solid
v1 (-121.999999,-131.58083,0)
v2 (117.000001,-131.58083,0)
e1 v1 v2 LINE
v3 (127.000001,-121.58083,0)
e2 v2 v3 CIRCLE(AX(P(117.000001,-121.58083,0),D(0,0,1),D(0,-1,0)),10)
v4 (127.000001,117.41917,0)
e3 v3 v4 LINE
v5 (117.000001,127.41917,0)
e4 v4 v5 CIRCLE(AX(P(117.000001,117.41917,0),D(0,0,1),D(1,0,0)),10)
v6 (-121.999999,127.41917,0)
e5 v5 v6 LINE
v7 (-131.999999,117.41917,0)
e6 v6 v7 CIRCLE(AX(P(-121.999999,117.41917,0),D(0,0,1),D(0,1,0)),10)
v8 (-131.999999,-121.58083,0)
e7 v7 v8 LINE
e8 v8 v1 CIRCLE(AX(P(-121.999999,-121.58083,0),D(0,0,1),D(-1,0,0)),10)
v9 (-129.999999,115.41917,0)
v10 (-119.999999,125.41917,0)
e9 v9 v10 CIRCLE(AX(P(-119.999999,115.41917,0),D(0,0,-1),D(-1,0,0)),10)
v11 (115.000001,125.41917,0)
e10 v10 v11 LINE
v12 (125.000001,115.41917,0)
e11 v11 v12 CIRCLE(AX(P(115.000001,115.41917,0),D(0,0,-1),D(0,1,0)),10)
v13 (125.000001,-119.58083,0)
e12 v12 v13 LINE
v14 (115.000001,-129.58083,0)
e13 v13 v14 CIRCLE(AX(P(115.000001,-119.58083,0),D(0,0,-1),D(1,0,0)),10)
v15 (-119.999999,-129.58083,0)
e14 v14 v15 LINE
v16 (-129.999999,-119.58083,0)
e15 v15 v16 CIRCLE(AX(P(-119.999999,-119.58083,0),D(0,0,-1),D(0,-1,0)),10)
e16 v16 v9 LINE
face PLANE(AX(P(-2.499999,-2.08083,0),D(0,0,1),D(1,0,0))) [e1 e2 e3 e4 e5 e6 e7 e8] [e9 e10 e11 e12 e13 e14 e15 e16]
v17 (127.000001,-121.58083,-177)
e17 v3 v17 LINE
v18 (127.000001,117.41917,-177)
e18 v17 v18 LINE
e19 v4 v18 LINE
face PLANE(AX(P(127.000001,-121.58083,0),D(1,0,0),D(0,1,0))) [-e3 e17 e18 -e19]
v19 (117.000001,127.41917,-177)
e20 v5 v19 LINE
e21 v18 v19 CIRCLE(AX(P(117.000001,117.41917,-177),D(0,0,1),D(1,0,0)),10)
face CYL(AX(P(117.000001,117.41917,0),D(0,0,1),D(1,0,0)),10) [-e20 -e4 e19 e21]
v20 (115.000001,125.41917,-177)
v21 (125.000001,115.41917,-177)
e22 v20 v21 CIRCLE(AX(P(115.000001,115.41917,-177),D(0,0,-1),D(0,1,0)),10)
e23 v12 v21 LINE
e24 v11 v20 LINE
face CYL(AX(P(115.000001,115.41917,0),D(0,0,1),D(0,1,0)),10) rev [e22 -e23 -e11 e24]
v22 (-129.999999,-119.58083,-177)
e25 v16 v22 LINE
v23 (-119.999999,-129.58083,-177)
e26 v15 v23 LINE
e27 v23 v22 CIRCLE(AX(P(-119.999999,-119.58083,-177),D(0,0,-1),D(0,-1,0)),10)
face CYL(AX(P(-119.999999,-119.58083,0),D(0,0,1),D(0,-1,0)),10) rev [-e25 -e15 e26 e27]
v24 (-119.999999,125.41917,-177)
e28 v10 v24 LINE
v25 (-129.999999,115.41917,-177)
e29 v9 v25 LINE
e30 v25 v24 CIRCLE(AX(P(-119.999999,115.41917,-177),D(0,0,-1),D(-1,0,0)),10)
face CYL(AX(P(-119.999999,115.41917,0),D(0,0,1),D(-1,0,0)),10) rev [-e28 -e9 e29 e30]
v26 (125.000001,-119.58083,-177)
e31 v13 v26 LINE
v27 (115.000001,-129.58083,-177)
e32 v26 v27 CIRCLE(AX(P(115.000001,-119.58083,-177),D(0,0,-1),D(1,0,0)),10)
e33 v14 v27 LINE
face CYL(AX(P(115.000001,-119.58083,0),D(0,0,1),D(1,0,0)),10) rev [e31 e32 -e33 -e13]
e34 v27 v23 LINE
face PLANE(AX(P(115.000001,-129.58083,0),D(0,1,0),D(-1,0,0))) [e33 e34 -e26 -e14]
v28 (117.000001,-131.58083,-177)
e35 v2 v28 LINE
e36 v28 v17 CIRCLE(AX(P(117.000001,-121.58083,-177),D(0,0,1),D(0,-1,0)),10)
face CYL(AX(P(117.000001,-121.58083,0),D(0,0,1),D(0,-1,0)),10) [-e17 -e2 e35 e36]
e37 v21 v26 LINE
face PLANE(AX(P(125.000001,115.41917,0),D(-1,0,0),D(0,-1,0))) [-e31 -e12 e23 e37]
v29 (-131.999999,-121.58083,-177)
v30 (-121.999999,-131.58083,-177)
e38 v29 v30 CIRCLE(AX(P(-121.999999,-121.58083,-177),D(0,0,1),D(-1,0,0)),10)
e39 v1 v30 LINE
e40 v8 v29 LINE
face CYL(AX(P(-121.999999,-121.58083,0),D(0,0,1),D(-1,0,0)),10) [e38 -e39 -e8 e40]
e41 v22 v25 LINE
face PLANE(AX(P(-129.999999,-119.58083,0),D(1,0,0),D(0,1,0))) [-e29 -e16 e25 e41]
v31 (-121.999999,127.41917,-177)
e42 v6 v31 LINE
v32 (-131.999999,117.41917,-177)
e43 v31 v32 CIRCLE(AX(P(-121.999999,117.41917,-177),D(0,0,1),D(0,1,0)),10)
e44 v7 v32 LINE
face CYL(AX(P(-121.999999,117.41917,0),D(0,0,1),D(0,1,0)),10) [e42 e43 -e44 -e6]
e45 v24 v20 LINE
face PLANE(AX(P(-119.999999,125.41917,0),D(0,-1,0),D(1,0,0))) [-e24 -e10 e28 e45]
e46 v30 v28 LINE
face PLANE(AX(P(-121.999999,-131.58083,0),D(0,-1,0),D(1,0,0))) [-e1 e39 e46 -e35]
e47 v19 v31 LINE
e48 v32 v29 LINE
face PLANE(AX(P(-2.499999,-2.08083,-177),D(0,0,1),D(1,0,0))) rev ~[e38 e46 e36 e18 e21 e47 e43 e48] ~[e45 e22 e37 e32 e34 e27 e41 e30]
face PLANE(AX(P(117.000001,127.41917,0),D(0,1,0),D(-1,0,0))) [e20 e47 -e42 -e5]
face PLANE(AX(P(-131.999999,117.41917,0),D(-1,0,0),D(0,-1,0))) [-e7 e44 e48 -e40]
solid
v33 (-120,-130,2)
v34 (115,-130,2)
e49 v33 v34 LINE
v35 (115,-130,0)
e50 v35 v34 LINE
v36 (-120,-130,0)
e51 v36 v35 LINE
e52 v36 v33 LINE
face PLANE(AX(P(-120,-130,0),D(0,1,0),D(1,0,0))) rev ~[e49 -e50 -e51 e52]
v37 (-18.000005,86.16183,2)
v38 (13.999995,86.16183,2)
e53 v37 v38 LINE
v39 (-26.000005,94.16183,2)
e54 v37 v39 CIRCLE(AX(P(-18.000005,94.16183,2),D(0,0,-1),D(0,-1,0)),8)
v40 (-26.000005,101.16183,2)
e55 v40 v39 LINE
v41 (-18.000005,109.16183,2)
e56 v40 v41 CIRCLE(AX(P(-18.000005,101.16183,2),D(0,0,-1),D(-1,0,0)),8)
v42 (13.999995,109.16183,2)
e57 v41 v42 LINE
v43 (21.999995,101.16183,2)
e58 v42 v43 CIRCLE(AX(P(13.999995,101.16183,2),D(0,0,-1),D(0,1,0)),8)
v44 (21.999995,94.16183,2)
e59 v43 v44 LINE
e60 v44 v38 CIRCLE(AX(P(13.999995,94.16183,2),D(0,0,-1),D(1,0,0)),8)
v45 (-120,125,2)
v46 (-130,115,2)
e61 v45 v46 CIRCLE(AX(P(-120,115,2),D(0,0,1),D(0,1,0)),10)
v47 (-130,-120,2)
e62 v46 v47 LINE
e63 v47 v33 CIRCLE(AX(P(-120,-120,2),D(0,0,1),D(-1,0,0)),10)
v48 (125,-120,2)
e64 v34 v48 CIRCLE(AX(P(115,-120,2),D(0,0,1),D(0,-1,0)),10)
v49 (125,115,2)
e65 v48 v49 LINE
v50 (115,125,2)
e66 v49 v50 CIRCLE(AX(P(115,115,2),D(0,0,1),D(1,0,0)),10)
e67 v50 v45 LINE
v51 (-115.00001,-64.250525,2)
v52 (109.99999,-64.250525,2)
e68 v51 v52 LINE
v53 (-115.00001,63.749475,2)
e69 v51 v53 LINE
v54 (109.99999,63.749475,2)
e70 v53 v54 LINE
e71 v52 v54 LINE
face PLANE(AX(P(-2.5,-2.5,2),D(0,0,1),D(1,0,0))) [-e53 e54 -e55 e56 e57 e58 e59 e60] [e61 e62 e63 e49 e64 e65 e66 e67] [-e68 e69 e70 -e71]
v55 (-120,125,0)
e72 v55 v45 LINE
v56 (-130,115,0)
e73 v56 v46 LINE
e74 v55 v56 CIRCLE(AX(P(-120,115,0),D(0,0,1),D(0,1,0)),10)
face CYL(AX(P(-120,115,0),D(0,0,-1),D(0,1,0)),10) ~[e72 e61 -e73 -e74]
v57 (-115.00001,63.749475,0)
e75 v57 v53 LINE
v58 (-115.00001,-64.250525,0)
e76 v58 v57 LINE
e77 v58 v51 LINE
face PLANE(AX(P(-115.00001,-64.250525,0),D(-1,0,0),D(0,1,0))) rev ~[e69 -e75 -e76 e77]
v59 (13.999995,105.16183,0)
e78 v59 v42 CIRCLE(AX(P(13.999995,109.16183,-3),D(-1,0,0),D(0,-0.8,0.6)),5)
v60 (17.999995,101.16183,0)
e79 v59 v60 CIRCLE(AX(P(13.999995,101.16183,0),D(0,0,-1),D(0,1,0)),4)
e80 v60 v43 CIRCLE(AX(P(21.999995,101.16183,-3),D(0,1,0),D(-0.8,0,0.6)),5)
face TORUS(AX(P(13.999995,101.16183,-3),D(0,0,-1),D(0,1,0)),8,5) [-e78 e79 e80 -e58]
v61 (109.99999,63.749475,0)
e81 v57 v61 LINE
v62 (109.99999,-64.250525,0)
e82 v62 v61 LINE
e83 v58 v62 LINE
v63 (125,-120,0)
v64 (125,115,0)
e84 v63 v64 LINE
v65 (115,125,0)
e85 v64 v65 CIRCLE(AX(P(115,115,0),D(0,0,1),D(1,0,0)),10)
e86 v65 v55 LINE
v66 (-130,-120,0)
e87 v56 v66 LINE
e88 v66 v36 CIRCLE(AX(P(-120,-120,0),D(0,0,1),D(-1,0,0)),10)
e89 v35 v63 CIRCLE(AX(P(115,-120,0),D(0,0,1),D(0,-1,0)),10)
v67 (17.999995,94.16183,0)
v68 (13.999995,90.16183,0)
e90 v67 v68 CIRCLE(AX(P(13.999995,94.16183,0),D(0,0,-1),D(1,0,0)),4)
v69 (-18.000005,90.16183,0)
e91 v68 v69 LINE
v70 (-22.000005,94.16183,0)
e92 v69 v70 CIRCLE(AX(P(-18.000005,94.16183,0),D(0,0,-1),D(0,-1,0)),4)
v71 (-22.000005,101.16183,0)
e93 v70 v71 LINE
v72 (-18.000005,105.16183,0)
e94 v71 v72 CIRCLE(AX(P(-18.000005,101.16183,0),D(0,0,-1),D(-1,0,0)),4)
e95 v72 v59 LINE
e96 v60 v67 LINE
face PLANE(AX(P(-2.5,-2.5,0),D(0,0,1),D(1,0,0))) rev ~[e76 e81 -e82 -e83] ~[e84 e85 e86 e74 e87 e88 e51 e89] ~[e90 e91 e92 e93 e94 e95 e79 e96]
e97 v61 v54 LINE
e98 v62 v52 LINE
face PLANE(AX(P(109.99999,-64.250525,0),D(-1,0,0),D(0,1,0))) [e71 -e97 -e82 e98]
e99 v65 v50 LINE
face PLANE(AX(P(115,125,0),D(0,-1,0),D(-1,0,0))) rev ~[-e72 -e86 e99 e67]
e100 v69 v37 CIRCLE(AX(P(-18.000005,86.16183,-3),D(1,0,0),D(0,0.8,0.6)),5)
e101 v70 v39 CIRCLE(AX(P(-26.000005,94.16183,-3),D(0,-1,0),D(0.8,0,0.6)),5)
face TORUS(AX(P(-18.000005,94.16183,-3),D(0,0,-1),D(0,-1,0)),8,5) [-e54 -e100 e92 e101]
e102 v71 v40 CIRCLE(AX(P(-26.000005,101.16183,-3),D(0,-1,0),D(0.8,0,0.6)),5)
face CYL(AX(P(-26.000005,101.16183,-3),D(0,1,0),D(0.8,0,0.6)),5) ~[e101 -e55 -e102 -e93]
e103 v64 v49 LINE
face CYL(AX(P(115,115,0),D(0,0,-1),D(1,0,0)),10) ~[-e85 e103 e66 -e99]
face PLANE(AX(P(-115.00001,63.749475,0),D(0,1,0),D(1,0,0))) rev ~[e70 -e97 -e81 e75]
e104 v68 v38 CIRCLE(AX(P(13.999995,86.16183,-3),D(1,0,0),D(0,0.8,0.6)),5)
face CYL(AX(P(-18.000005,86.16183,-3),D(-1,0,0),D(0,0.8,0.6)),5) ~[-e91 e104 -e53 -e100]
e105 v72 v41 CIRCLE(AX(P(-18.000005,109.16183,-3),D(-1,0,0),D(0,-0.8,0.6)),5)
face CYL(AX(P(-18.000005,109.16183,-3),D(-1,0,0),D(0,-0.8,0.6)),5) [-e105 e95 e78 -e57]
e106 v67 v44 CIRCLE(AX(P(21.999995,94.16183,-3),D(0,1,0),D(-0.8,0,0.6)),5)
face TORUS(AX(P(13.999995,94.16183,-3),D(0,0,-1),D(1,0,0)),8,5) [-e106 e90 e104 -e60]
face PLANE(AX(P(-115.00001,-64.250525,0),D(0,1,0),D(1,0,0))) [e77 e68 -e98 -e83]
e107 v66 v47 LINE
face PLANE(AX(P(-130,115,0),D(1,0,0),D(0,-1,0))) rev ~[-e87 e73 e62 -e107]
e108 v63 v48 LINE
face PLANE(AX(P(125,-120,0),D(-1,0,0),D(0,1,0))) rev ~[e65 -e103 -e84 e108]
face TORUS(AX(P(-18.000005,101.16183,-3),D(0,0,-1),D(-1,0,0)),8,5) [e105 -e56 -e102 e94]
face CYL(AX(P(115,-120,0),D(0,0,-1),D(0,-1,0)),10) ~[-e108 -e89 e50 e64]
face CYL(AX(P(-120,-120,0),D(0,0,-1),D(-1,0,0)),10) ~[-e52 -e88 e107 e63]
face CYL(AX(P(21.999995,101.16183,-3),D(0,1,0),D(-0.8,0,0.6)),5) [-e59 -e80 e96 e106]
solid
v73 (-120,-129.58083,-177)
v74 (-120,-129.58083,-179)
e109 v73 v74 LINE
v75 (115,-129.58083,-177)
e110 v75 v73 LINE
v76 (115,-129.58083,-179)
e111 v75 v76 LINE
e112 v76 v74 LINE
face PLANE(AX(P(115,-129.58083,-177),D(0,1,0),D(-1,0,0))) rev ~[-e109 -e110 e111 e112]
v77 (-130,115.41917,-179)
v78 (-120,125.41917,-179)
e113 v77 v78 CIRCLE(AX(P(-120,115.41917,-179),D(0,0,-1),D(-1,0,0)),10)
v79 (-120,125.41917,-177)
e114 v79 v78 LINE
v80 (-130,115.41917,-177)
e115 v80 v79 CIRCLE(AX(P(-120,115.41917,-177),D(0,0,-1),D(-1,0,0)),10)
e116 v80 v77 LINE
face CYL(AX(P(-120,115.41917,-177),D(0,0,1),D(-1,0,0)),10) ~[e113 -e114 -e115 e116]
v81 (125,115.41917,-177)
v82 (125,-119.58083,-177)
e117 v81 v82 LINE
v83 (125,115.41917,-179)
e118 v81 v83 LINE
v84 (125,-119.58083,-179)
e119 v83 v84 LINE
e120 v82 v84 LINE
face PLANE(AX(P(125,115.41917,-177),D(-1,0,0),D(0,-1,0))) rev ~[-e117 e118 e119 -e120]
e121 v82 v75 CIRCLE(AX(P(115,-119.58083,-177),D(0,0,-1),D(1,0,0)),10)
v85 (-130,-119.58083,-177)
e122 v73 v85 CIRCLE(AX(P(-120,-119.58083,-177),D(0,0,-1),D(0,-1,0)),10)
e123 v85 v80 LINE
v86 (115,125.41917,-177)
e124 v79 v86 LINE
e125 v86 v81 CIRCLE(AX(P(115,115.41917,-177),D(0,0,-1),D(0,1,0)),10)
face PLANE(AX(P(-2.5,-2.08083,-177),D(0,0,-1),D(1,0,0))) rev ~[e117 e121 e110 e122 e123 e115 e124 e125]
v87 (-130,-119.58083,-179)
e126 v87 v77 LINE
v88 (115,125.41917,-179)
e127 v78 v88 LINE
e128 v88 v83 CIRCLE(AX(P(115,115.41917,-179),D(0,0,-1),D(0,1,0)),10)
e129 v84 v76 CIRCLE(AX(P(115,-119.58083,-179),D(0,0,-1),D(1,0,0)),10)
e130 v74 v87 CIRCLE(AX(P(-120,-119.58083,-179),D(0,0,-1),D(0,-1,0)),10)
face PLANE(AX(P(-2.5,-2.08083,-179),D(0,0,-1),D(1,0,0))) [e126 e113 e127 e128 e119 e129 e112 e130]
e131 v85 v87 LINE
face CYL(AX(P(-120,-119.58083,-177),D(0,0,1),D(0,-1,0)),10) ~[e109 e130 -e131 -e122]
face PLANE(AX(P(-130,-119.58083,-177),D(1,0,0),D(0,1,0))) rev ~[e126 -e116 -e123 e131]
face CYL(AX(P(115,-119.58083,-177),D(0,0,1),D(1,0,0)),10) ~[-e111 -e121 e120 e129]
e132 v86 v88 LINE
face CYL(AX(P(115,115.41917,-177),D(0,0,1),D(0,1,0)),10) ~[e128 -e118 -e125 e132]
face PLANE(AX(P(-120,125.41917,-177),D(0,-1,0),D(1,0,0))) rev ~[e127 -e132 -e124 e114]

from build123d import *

# Parameters (mm, degrees)
F0_W         = 225
F0_H         = 128
F1_DEPTH     = 2
F2_T1_DEPTH  = 32
F2_T3_DEPTH  = 7
F2_T6_ANGLE  = 90
F2_T8_ANGLE  = 90
F2_T10_ANGLE = 90
F2_T12_ANGLE = 90
F4_DEPTH     = 177
F6_DEPTH     = 2


# Not quite as in the source:
# - a fillet or chamfer that OpenCascade refuses, or shapes differently, is made with other operations: its cross-section is extruded or revolved along the edge and cut away or added


with BuildPart() as f1:
    # F0 (on Top) → F1 (new body)
    with BuildSketch(Plane.XY):
        with BuildLine():
            Line((-120, -130), (115, -130))
            ThreePointArc((115, -130), (122.0710678119, -127.0710678119), (125, -120))
            Line((125, -120), (125, 115))
            ThreePointArc((125, 115), (122.0710678119, 122.0710678119), (115, 125))
            Line((115, 125), (-120, 125))
            ThreePointArc((-120, 125), (-127.0710678119, 122.0710678119), (-130, 115))
            Line((-130, 115), (-130, -120))
            ThreePointArc((-130, -120), (-127.0710678119, -127.0710678119), (-120, -130))
        make_face()
        with Locations((-2.5000095367, -0.2505254149)):
            Rectangle(F0_W, F0_H, mode=Mode.SUBTRACT)
        with BuildLine():
            Line((-18.0000054687, 105.1618295312), (13.9999945313, 105.1618295312))
            ThreePointArc((13.9999945313, 105.1618295312), (16.828421656, 103.9902566559), (17.9999945313, 101.1618295312))
            Line((17.9999945313, 101.1618295312), (17.9999945313, 94.1618295312))
            ThreePointArc((17.9999945313, 94.1618295312), (16.828421656, 91.3334024064), (13.9999945313, 90.1618295312))
            Line((13.9999945313, 90.1618295312), (-18.0000054687, 90.1618295312))
            ThreePointArc((-18.0000054687, 90.1618295312), (-20.8284325935, 91.3334024064), (-22.0000054687, 94.1618295312))
            Line((-22.0000054687, 94.1618295312), (-22.0000054687, 101.1618295312))
            ThreePointArc((-22.0000054687, 101.1618295312), (-20.8284325935, 103.9902566559), (-18.0000054687, 105.1618295312))
        make_face(mode=Mode.SUBTRACT)
    extrude(amount=F1_DEPTH)

    # F2: fillet of radius 5 on 1 edges, made by hand

    # F2_s2 → F2_t1 (cut)
    with BuildSketch(Plane.YZ.offset(-18.0000054687)):
        with BuildLine():
            ThreePointArc((90.1618295312, 0), (88.3978975087, 1.472135955), (86.1618295312, 2))
            Line((86.1618295312, 2), (90.1618295312, 2))
            Line((90.1618295312, 2), (90.1618295312, 0))
        make_face()
        with BuildLine():
            ThreePointArc((105.1618295312, 0), (106.9257615537, 1.472135955), (109.1618295312, 2))
            Line((109.1618295312, 2), (105.1618295312, 2))
            Line((105.1618295312, 2), (105.1618295312, 0))
        make_face()
    extrude(amount=F2_T1_DEPTH, mode=Mode.SUBTRACT)

    # F2_s4 → F2_t3 (cut)
    with BuildSketch(Plane.XZ.offset(-101.1618295312)):
        with BuildLine():
            ThreePointArc((-22.0000054687, 0), (-23.7639374912, 1.472135955), (-26.0000054687, 2))
            Line((-26.0000054687, 2), (-22.0000054687, 2))
            Line((-22.0000054687, 2), (-22.0000054687, 0))
        make_face()
        with BuildLine():
            ThreePointArc((17.9999945313, 0), (19.7639265538, 1.472135955), (21.9999945313, 2))
            Line((21.9999945313, 2), (17.9999945313, 2))
            Line((17.9999945313, 2), (17.9999945313, 0))
        make_face()
    extrude(amount=F2_T3_DEPTH, mode=Mode.SUBTRACT)

    # F2_s5 → F2_t6 (revolve, cut)
    with BuildSketch(Plane.XZ.offset(-94.1618295312)):
        with BuildLine():
            ThreePointArc((17.9999945313, 0), (19.7639265538, 1.472135955), (21.9999945313, 2))
            Line((21.9999945313, 2), (17.9999945313, 2))
            Line((17.9999945313, 2), (17.9999945313, 0))
        make_face()
    revolve(axis=Axis((13.9999945313, 94.1618295312, 2), (0, 0, -1)), revolution_arc=F2_T6_ANGLE, mode=Mode.SUBTRACT)

    # F2_s7 → F2_t8 (revolve, cut)
    with BuildSketch(Plane.YZ.offset(-18.0000054687)):
        with BuildLine():
            ThreePointArc((90.1618295312, 0), (88.3978975087, 1.472135955), (86.1618295312, 2))
            Line((86.1618295312, 2), (90.1618295312, 2))
            Line((90.1618295312, 2), (90.1618295312, 0))
        make_face()
    revolve(axis=Axis((-18.0000054687, 94.1618295312, 2), (0, 0, -1)), revolution_arc=F2_T8_ANGLE, mode=Mode.SUBTRACT)

    # F2_s9 → F2_t10 (revolve, cut)
    with BuildSketch(Plane.XZ.offset(-101.1618295312)):
        with BuildLine():
            ThreePointArc((-22.0000054687, 0), (-23.7639374912, 1.472135955), (-26.0000054687, 2))
            Line((-26.0000054687, 2), (-22.0000054687, 2))
            Line((-22.0000054687, 2), (-22.0000054687, 0))
        make_face()
    revolve(axis=Axis((-18.0000054687, 101.1618295312, 2), (0, 0, -1)), revolution_arc=F2_T10_ANGLE, mode=Mode.SUBTRACT)

    # F2_s11 → F2_t12 (revolve, cut)
    with BuildSketch(Plane.YZ.offset(13.9999945313)):
        with BuildLine():
            ThreePointArc((105.1618295312, 0), (106.9257615537, 1.472135955), (109.1618295312, 2))
            Line((109.1618295312, 2), (105.1618295312, 2))
            Line((105.1618295312, 2), (105.1618295312, 0))
        make_face()
    revolve(axis=Axis((13.9999945313, 101.1618295312, 2), (0, 0, -1)), revolution_arc=F2_T12_ANGLE, mode=Mode.SUBTRACT)


with BuildPart() as f4:
    # F3 (on Top) → F4 (new body)
    with BuildSketch(Plane.XY):
        with BuildLine():
            Line((-121.9999992847, -131.5808296204), (117.0000007153, -131.5808296204))
            ThreePointArc((117.0000007153, -131.5808296204), (124.0710685271, -128.6518974322), (127.0000007153, -121.5808296204))
            Line((127.0000007153, -121.5808296204), (127.0000007153, 117.4191703796))
            ThreePointArc((127.0000007153, 117.4191703796), (124.0710685271, 124.4902381915), (117.0000007153, 127.4191703796))
            Line((117.0000007153, 127.4191703796), (-121.9999992847, 127.4191703796))
            ThreePointArc((-121.9999992847, 127.4191703796), (-129.0710670966, 124.4902381915), (-131.9999992847, 117.4191703796))
            Line((-131.9999992847, 117.4191703796), (-131.9999992847, -121.5808296204))
            ThreePointArc((-131.9999992847, -121.5808296204), (-129.0710670966, -128.6518974322), (-121.9999992847, -131.5808296204))
        make_face()
        with BuildLine():
            ThreePointArc((125.0000007153, -119.5808296204), (122.0710685271, -126.6518974322), (115.0000007153, -129.5808296204))
            Line((115.0000007153, -129.5808296204), (-119.9999992847, -129.5808296204))
            ThreePointArc((-119.9999992847, -129.5808296204), (-127.0710670966, -126.6518974322), (-129.9999992847, -119.5808296204))
            Line((-129.9999992847, -119.5808296204), (-129.9999992847, 115.4191703796))
            ThreePointArc((-129.9999992847, 115.4191703796), (-127.0710670966, 122.4902381915), (-119.9999992847, 125.4191703796))
            Line((-119.9999992847, 125.4191703796), (115.0000007153, 125.4191703796))
            ThreePointArc((115.0000007153, 125.4191703796), (122.0710685271, 122.4902381915), (125.0000007153, 115.4191703796))
            Line((125.0000007153, 115.4191703796), (125.0000007153, -119.5808296204))
        make_face(mode=Mode.SUBTRACT)
    extrude(amount=-F4_DEPTH)


with BuildPart() as f6:
    # F5 (on face) → F6 (new body)
    with BuildSketch(Plane(origin=(0, 0, -177), x_dir=(1, 0, 0), z_dir=(0, 0, -1))):
        with BuildLine():
            Line((-120, -125.4191703796), (115, -125.4191703796))
            ThreePointArc((115, -125.4191703796), (122.0710678119, -122.4902381915), (125, -115.4191703796))
            Line((125, -115.4191703796), (125, 119.5808296204))
            ThreePointArc((125, 119.5808296204), (122.0710678119, 126.6518974322), (115, 129.5808296204))
            Line((115, 129.5808296204), (-120, 129.5808296204))
            ThreePointArc((-120, 129.5808296204), (-127.0710678119, 126.6518974322), (-130, 119.5808296204))
            Line((-130, 119.5808296204), (-130, -115.4191703796))
            ThreePointArc((-130, -115.4191703796), (-127.0710678119, -122.4902381915), (-120, -125.4191703796))
        make_face()
    extrude(amount=F6_DEPTH)


solid = Compound([f1.part, f4.part, f6.part])
